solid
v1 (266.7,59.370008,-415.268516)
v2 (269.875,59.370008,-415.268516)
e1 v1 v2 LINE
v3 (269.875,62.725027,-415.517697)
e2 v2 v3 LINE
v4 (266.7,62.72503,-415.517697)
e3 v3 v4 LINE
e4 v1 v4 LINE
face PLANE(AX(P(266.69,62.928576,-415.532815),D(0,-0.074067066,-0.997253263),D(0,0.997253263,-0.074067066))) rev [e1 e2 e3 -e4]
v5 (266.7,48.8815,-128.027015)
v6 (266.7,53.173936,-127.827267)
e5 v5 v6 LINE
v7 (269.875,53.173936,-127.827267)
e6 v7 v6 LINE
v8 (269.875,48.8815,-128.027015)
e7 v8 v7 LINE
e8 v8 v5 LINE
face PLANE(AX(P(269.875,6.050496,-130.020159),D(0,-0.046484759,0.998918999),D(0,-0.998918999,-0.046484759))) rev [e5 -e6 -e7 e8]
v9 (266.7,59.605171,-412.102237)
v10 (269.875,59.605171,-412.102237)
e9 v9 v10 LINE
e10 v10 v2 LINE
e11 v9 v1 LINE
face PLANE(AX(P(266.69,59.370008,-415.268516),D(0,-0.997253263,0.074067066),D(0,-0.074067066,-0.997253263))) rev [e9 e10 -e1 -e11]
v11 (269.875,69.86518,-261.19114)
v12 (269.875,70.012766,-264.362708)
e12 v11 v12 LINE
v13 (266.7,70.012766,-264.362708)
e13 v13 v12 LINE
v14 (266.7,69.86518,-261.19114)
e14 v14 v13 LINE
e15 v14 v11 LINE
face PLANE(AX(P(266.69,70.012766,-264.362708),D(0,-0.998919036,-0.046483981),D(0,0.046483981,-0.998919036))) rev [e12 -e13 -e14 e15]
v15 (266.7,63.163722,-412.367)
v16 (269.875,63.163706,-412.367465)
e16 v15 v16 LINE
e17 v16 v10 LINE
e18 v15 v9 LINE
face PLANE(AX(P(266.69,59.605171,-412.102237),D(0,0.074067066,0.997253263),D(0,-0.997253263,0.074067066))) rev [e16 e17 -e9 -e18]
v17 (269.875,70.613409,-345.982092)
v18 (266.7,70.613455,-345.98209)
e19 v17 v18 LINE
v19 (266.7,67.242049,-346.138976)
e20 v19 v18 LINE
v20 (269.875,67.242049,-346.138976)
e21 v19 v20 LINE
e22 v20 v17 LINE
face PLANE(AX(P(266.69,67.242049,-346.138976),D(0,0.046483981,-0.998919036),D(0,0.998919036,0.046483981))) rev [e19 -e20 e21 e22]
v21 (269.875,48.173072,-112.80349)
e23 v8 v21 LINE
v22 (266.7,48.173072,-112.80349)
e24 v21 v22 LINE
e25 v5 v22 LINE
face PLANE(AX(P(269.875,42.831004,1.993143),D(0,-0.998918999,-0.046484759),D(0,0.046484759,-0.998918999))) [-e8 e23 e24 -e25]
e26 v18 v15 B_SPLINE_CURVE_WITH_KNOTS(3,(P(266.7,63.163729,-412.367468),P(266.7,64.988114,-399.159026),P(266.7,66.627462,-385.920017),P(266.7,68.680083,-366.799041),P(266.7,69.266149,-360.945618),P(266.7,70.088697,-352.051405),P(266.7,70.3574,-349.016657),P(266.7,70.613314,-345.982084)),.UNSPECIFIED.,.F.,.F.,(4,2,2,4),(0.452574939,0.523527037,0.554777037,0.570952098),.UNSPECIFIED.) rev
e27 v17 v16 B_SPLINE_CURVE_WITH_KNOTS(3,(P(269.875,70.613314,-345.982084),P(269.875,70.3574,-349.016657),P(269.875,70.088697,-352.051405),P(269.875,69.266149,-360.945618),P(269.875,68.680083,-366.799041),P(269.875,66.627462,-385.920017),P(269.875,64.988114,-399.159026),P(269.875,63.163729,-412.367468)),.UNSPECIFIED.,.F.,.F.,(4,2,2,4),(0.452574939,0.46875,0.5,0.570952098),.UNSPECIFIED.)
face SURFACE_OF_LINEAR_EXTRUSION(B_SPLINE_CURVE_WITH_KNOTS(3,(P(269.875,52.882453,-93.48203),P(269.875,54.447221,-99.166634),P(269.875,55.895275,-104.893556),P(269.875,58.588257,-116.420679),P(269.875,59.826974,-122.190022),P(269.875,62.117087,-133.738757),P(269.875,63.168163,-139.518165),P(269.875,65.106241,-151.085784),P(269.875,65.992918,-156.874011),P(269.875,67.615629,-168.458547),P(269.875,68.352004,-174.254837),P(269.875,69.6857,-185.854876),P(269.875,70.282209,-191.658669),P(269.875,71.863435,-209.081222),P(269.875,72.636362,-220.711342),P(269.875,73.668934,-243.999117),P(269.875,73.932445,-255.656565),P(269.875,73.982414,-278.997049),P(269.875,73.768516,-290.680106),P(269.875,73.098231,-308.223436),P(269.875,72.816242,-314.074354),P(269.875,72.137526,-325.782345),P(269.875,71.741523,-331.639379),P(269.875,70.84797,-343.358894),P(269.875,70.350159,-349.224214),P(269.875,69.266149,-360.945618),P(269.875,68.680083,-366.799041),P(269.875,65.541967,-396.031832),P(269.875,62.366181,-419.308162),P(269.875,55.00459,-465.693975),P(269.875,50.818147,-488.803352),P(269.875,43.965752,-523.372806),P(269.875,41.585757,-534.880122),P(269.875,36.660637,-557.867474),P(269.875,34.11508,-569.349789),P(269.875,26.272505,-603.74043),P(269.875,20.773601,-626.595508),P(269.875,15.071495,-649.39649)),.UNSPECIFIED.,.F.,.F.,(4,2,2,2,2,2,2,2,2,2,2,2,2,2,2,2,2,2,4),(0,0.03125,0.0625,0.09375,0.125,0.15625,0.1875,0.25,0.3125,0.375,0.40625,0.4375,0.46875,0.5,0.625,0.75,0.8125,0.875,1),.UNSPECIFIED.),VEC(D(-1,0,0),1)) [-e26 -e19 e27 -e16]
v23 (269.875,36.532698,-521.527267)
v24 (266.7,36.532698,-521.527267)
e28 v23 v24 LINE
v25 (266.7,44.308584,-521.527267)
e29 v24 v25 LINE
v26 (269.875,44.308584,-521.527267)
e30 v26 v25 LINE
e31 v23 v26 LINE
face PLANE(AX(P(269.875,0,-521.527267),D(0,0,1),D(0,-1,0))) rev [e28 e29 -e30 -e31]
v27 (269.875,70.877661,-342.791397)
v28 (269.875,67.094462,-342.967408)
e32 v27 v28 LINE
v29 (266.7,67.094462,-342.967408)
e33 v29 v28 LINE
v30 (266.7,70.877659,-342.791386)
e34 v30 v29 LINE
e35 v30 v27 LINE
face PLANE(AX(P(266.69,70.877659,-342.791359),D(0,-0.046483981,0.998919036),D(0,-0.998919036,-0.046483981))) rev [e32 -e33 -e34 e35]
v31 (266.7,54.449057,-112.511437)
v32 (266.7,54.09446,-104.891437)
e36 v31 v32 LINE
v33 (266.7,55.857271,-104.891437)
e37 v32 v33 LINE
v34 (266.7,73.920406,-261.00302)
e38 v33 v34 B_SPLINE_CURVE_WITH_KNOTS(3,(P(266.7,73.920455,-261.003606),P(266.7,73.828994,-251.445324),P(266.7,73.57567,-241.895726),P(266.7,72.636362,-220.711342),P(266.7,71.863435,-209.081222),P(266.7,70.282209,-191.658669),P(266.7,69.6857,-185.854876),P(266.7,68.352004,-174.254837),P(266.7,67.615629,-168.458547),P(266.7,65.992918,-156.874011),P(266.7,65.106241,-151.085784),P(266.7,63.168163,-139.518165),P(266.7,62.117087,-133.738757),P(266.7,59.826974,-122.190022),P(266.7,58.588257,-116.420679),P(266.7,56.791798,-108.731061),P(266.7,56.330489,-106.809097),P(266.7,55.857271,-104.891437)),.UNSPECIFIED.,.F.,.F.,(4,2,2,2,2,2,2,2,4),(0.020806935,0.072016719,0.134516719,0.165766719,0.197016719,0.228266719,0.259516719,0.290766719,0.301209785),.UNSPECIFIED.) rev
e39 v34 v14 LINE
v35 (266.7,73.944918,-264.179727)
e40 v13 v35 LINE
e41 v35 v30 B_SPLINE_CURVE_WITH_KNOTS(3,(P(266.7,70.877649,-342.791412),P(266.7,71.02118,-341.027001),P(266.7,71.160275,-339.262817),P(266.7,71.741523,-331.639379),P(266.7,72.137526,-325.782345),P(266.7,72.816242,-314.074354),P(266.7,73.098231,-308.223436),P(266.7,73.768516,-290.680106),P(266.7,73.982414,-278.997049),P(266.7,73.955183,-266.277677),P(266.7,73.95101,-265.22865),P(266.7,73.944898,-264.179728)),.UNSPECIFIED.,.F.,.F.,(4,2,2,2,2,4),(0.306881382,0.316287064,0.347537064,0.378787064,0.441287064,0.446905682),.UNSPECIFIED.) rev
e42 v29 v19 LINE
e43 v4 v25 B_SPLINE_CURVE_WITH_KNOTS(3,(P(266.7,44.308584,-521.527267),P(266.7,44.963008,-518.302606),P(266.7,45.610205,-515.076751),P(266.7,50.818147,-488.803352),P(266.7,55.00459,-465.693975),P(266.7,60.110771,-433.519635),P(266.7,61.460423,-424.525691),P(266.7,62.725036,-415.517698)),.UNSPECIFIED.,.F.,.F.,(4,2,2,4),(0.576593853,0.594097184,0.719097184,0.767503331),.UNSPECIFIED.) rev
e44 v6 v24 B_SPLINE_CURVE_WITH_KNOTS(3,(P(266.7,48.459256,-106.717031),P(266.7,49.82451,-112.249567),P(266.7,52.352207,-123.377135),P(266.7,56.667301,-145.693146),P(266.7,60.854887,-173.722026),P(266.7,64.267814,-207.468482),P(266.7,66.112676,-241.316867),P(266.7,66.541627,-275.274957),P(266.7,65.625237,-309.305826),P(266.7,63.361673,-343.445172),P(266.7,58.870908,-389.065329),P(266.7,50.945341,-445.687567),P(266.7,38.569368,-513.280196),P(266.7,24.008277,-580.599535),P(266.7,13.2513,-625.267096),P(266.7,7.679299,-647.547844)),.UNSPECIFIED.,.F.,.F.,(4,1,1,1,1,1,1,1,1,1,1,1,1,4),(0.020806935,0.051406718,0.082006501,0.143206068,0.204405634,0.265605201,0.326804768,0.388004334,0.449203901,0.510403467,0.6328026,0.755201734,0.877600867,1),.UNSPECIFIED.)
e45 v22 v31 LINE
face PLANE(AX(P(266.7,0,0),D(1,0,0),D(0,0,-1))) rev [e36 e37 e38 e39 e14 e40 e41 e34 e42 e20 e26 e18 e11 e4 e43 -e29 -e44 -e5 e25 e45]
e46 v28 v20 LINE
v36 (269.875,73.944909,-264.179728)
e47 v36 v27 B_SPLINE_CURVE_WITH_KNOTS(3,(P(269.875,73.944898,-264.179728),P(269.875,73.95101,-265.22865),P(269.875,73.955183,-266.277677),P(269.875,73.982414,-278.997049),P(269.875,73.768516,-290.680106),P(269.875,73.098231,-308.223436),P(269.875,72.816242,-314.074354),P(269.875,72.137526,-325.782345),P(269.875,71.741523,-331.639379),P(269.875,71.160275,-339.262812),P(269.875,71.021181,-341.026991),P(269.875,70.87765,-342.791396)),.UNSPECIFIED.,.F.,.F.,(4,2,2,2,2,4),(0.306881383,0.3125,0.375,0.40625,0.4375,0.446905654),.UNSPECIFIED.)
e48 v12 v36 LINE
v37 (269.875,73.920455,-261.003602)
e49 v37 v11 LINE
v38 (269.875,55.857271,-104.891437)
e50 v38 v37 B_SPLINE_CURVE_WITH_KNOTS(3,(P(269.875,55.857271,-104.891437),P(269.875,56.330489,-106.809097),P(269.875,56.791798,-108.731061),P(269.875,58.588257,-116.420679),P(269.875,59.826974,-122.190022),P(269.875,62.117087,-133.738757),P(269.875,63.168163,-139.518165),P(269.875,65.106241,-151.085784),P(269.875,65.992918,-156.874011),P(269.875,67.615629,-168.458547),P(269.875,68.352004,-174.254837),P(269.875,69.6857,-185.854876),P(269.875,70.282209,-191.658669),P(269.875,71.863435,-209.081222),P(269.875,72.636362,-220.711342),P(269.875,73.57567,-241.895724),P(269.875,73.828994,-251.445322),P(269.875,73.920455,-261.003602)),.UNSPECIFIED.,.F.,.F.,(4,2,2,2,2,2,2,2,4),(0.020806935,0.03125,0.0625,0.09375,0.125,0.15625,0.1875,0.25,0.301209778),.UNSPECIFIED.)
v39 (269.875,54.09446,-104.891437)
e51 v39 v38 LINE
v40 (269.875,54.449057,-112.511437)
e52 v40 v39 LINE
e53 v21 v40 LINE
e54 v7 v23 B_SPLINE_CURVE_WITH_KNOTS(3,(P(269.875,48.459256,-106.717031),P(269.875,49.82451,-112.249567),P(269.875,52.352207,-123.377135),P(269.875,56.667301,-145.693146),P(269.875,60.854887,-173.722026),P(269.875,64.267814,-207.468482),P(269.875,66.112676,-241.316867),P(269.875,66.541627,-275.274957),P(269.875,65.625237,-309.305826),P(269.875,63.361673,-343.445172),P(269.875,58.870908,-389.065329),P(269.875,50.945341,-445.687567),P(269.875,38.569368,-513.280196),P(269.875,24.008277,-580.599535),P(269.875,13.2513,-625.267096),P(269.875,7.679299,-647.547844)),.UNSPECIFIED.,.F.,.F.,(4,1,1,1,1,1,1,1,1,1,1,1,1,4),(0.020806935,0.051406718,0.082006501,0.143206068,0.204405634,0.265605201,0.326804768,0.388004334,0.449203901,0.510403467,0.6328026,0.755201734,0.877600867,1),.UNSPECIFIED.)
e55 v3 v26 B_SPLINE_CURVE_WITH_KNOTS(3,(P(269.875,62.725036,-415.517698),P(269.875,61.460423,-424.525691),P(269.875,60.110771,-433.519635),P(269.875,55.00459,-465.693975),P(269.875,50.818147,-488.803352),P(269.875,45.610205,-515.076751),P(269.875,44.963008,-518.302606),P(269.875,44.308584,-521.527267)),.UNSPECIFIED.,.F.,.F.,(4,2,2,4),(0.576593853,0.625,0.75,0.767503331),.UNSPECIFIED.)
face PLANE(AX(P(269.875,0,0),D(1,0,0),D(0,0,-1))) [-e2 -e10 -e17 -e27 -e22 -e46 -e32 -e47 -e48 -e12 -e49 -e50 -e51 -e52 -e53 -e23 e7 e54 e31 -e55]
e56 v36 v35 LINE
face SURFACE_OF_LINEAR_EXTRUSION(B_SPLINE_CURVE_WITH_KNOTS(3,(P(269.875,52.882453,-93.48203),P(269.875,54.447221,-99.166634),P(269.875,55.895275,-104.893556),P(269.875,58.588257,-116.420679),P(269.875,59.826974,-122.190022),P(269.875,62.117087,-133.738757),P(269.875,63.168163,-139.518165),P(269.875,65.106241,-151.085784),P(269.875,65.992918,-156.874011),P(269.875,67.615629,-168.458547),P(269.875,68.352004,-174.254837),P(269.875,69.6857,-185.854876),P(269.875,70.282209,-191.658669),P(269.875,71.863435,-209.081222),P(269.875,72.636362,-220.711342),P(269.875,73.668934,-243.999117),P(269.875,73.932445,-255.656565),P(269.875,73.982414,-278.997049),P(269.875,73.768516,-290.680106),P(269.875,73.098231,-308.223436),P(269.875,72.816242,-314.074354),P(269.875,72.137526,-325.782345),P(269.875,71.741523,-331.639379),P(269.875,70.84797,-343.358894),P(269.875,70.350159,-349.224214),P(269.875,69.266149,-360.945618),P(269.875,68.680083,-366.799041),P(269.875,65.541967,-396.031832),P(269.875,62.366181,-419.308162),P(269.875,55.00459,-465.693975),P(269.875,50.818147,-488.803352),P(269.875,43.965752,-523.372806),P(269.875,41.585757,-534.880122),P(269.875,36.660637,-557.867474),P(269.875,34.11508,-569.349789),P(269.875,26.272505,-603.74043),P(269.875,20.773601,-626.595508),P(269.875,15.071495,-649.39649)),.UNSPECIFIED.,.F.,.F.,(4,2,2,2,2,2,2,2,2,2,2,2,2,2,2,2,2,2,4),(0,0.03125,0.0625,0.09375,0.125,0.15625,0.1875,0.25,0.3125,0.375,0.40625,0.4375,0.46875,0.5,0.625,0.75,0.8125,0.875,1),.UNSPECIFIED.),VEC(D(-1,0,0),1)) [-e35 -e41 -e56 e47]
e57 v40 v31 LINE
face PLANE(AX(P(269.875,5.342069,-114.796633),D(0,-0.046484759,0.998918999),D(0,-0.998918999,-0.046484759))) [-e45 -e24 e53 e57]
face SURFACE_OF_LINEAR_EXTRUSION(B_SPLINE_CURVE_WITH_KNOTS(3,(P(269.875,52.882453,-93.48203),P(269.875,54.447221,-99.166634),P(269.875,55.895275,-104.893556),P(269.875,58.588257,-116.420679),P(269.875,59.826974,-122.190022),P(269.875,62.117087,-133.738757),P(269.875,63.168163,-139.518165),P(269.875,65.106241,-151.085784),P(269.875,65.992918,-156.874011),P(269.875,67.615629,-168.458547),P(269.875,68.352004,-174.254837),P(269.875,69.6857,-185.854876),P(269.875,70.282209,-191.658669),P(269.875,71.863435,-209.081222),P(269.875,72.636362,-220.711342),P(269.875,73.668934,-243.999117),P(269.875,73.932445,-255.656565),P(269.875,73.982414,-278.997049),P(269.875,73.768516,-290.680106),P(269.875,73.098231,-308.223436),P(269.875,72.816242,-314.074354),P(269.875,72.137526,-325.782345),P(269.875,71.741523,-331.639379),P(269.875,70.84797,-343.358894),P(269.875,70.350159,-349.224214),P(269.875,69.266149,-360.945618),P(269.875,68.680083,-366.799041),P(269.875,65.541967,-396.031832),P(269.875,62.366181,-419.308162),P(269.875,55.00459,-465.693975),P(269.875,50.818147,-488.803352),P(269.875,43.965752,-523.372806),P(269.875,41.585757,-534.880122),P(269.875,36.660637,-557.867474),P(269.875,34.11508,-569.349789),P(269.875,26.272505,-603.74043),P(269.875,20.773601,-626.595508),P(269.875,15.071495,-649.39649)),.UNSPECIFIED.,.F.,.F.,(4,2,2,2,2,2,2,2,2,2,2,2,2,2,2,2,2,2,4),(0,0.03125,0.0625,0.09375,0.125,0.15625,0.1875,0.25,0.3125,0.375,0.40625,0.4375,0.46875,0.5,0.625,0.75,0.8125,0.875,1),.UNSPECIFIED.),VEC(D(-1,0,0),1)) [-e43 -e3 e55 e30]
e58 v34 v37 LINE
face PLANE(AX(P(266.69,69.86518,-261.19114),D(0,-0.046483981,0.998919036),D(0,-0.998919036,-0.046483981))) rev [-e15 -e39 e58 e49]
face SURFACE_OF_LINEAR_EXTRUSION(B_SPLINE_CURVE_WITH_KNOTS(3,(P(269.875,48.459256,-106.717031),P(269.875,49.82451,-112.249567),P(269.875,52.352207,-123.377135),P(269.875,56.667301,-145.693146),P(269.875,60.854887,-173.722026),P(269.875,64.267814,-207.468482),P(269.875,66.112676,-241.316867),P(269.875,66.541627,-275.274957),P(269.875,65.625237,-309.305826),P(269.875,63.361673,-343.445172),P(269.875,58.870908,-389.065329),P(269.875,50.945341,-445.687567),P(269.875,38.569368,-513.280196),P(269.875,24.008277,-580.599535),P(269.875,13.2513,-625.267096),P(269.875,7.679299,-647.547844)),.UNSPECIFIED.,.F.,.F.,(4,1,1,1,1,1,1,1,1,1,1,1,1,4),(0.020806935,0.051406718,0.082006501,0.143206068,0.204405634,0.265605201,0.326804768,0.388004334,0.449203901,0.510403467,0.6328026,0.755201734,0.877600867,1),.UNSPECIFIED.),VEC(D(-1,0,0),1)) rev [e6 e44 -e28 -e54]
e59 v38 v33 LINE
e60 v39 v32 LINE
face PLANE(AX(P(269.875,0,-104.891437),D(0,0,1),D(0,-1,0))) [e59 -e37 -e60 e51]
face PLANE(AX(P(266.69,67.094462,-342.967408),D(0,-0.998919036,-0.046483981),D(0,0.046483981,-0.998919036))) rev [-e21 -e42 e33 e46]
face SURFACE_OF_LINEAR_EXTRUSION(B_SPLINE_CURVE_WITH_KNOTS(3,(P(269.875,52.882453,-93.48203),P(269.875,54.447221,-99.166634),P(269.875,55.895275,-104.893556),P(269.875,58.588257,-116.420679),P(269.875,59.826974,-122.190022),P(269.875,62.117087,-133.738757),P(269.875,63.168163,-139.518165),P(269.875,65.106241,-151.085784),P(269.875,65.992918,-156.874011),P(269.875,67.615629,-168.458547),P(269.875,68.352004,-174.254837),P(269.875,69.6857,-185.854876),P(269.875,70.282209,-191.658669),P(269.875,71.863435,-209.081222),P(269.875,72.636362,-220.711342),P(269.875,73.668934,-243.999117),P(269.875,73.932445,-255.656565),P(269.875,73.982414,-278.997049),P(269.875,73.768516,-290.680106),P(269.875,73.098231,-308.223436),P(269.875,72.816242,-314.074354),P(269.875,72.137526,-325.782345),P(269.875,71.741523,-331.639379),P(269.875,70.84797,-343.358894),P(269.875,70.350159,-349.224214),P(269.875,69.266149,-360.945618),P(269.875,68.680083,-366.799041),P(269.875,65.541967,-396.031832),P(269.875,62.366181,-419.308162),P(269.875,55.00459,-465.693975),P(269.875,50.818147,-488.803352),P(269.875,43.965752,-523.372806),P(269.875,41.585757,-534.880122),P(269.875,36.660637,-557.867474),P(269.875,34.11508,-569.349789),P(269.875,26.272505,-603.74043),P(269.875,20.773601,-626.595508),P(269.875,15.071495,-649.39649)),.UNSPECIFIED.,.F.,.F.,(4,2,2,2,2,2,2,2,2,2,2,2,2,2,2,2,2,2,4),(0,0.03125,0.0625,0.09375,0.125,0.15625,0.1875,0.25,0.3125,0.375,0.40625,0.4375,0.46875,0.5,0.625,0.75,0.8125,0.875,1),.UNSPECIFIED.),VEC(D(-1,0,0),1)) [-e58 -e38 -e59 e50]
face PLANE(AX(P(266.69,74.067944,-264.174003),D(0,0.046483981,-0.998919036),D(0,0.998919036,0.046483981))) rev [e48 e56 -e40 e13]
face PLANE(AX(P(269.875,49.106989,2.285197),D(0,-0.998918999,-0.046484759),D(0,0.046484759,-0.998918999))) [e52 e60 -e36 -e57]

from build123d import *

# Parameters (mm, degrees)
BOSS_EXTRUDE1_DEPTH = 3.175
CUT_EXTRUDE1_DEPTH  = 527.754935473


# Read off the part's stored shape, not the designer's step: Boss-Extrude1
with BuildPart() as part:
    # Boss-Extrude1 outline → Boss-Extrude1 (new body)
    with BuildSketch(Plane(origin=(266.7, 0, 0), x_dir=(0, 0, -1), z_dir=(1, 0, 0))):
        with BuildLine():
            Line((128.027015481, 48.881499991), (127.827266707, 53.173935834))
            add(Edge.make_bspline(
                [(127.827266707, 53.173935834), (131.921402112, 53.99855442), (147.182576255, 56.889826094), (173.722026174, 60.854887486), (207.468481867, 64.267813608), (241.316867465, 66.112676281), (275.274956706, 66.541627017), (309.305825998, 65.625236621), (343.44517215, 63.361672788), (389.065328756, 58.870907886), (445.687567425, 50.945340654), (493.519820497, 42.187423282), (518.763758442, 37.095573069), (521.527266707, 36.532698197)],
                knots=[0.059536949, 0.059536949, 0.059536949, 0.059536949, 0.082006501, 0.143206068, 0.204405634, 0.265605201, 0.326804768, 0.388004334, 0.449203901, 0.510403467, 0.6328026, 0.755201734, 0.770252495, 0.770252495, 0.770252495, 0.770252495], degree=3))
            Line((521.527266707, 36.532698197), (521.527266707, 44.308584377))
            add(Edge.make_bspline(
                [(104.891436574, 55.857271259), (106.809097214, 56.330488533), (108.731061496, 56.791798305), (116.420679251, 58.588256864), (122.190022223, 59.826974293), (133.738756637, 62.117087477), (139.518165271, 63.168162708), (151.085783849, 65.106240842), (156.874011273, 65.992917854), (168.458547012, 67.615629429), (174.254837098, 68.352003798), (185.85487642, 69.685700496), (191.6586693, 70.282209193), (209.08122178, 71.863434658), (220.711342362, 72.636362119), (243.999117493, 73.668934014), (255.656564607, 73.932445396), (278.997049406, 73.982413526), (290.68010607, 73.768516469), (308.223436016, 73.098231047), (314.074354032, 72.816241787), (325.782344918, 72.137525629), (331.639378938, 71.741522982), (343.358894278, 70.847970122), (349.22421427, 70.350159344), (360.945617689, 69.2661489), (366.799040843, 68.680082864), (396.03183172, 65.54196658), (419.308162467, 62.366180875), (465.693975492, 55.004590459), (488.803352282, 50.818147164), (515.076751448, 45.610205198), (518.30260596, 44.96300802), (521.527266707, 44.308584377)],
                knots=[0.020806935, 0.020806935, 0.020806935, 0.020806935, 0.03125, 0.03125, 0.0625, 0.0625, 0.09375, 0.09375, 0.125, 0.125, 0.15625, 0.15625, 0.1875, 0.1875, 0.25, 0.25, 0.3125, 0.3125, 0.375, 0.375, 0.40625, 0.40625, 0.4375, 0.4375, 0.46875, 0.46875, 0.5, 0.5, 0.625, 0.625, 0.75, 0.75, 0.767503331, 0.767503331, 0.767503331, 0.767503331], degree=3))
            Line((104.891436574, 55.857271259), (104.891436574, 54.094460032))
            Line((104.891436574, 54.094460032), (112.511436574, 54.449057215))
            Line((112.511436574, 54.449057215), (112.803489932, 48.173072263))
            Line((112.803489932, 48.173072263), (128.027015481, 48.881499991))
        make_face()
    extrude(amount=BOSS_EXTRUDE1_DEPTH)

    # Sketch2 → Cut-Extrude1 (cut, through all)
    with BuildSketch(Plane(origin=(269.875, 0, 0), x_dir=(0, 0, -1), z_dir=(1, 0, 0))):
        Polygon((412.10223691, 59.605171111), (412.366535562, 63.163739119), (415.53281467, 62.928576184), (415.268516018, 59.370008176), align=None)
        Polygon((261.19113958, 69.865179785), (261.002434803, 73.920357299), (264.174002738, 74.067943938), (264.362707516, 70.012766424), align=None)
        Polygon((342.791359419, 70.877658902), (342.967407763, 67.094462217), (346.138975699, 67.242048857), (345.962927354, 71.025245541), align=None)
    extrude(amount=-CUT_EXTRUDE1_DEPTH, mode=Mode.SUBTRACT)


solid = part.part
